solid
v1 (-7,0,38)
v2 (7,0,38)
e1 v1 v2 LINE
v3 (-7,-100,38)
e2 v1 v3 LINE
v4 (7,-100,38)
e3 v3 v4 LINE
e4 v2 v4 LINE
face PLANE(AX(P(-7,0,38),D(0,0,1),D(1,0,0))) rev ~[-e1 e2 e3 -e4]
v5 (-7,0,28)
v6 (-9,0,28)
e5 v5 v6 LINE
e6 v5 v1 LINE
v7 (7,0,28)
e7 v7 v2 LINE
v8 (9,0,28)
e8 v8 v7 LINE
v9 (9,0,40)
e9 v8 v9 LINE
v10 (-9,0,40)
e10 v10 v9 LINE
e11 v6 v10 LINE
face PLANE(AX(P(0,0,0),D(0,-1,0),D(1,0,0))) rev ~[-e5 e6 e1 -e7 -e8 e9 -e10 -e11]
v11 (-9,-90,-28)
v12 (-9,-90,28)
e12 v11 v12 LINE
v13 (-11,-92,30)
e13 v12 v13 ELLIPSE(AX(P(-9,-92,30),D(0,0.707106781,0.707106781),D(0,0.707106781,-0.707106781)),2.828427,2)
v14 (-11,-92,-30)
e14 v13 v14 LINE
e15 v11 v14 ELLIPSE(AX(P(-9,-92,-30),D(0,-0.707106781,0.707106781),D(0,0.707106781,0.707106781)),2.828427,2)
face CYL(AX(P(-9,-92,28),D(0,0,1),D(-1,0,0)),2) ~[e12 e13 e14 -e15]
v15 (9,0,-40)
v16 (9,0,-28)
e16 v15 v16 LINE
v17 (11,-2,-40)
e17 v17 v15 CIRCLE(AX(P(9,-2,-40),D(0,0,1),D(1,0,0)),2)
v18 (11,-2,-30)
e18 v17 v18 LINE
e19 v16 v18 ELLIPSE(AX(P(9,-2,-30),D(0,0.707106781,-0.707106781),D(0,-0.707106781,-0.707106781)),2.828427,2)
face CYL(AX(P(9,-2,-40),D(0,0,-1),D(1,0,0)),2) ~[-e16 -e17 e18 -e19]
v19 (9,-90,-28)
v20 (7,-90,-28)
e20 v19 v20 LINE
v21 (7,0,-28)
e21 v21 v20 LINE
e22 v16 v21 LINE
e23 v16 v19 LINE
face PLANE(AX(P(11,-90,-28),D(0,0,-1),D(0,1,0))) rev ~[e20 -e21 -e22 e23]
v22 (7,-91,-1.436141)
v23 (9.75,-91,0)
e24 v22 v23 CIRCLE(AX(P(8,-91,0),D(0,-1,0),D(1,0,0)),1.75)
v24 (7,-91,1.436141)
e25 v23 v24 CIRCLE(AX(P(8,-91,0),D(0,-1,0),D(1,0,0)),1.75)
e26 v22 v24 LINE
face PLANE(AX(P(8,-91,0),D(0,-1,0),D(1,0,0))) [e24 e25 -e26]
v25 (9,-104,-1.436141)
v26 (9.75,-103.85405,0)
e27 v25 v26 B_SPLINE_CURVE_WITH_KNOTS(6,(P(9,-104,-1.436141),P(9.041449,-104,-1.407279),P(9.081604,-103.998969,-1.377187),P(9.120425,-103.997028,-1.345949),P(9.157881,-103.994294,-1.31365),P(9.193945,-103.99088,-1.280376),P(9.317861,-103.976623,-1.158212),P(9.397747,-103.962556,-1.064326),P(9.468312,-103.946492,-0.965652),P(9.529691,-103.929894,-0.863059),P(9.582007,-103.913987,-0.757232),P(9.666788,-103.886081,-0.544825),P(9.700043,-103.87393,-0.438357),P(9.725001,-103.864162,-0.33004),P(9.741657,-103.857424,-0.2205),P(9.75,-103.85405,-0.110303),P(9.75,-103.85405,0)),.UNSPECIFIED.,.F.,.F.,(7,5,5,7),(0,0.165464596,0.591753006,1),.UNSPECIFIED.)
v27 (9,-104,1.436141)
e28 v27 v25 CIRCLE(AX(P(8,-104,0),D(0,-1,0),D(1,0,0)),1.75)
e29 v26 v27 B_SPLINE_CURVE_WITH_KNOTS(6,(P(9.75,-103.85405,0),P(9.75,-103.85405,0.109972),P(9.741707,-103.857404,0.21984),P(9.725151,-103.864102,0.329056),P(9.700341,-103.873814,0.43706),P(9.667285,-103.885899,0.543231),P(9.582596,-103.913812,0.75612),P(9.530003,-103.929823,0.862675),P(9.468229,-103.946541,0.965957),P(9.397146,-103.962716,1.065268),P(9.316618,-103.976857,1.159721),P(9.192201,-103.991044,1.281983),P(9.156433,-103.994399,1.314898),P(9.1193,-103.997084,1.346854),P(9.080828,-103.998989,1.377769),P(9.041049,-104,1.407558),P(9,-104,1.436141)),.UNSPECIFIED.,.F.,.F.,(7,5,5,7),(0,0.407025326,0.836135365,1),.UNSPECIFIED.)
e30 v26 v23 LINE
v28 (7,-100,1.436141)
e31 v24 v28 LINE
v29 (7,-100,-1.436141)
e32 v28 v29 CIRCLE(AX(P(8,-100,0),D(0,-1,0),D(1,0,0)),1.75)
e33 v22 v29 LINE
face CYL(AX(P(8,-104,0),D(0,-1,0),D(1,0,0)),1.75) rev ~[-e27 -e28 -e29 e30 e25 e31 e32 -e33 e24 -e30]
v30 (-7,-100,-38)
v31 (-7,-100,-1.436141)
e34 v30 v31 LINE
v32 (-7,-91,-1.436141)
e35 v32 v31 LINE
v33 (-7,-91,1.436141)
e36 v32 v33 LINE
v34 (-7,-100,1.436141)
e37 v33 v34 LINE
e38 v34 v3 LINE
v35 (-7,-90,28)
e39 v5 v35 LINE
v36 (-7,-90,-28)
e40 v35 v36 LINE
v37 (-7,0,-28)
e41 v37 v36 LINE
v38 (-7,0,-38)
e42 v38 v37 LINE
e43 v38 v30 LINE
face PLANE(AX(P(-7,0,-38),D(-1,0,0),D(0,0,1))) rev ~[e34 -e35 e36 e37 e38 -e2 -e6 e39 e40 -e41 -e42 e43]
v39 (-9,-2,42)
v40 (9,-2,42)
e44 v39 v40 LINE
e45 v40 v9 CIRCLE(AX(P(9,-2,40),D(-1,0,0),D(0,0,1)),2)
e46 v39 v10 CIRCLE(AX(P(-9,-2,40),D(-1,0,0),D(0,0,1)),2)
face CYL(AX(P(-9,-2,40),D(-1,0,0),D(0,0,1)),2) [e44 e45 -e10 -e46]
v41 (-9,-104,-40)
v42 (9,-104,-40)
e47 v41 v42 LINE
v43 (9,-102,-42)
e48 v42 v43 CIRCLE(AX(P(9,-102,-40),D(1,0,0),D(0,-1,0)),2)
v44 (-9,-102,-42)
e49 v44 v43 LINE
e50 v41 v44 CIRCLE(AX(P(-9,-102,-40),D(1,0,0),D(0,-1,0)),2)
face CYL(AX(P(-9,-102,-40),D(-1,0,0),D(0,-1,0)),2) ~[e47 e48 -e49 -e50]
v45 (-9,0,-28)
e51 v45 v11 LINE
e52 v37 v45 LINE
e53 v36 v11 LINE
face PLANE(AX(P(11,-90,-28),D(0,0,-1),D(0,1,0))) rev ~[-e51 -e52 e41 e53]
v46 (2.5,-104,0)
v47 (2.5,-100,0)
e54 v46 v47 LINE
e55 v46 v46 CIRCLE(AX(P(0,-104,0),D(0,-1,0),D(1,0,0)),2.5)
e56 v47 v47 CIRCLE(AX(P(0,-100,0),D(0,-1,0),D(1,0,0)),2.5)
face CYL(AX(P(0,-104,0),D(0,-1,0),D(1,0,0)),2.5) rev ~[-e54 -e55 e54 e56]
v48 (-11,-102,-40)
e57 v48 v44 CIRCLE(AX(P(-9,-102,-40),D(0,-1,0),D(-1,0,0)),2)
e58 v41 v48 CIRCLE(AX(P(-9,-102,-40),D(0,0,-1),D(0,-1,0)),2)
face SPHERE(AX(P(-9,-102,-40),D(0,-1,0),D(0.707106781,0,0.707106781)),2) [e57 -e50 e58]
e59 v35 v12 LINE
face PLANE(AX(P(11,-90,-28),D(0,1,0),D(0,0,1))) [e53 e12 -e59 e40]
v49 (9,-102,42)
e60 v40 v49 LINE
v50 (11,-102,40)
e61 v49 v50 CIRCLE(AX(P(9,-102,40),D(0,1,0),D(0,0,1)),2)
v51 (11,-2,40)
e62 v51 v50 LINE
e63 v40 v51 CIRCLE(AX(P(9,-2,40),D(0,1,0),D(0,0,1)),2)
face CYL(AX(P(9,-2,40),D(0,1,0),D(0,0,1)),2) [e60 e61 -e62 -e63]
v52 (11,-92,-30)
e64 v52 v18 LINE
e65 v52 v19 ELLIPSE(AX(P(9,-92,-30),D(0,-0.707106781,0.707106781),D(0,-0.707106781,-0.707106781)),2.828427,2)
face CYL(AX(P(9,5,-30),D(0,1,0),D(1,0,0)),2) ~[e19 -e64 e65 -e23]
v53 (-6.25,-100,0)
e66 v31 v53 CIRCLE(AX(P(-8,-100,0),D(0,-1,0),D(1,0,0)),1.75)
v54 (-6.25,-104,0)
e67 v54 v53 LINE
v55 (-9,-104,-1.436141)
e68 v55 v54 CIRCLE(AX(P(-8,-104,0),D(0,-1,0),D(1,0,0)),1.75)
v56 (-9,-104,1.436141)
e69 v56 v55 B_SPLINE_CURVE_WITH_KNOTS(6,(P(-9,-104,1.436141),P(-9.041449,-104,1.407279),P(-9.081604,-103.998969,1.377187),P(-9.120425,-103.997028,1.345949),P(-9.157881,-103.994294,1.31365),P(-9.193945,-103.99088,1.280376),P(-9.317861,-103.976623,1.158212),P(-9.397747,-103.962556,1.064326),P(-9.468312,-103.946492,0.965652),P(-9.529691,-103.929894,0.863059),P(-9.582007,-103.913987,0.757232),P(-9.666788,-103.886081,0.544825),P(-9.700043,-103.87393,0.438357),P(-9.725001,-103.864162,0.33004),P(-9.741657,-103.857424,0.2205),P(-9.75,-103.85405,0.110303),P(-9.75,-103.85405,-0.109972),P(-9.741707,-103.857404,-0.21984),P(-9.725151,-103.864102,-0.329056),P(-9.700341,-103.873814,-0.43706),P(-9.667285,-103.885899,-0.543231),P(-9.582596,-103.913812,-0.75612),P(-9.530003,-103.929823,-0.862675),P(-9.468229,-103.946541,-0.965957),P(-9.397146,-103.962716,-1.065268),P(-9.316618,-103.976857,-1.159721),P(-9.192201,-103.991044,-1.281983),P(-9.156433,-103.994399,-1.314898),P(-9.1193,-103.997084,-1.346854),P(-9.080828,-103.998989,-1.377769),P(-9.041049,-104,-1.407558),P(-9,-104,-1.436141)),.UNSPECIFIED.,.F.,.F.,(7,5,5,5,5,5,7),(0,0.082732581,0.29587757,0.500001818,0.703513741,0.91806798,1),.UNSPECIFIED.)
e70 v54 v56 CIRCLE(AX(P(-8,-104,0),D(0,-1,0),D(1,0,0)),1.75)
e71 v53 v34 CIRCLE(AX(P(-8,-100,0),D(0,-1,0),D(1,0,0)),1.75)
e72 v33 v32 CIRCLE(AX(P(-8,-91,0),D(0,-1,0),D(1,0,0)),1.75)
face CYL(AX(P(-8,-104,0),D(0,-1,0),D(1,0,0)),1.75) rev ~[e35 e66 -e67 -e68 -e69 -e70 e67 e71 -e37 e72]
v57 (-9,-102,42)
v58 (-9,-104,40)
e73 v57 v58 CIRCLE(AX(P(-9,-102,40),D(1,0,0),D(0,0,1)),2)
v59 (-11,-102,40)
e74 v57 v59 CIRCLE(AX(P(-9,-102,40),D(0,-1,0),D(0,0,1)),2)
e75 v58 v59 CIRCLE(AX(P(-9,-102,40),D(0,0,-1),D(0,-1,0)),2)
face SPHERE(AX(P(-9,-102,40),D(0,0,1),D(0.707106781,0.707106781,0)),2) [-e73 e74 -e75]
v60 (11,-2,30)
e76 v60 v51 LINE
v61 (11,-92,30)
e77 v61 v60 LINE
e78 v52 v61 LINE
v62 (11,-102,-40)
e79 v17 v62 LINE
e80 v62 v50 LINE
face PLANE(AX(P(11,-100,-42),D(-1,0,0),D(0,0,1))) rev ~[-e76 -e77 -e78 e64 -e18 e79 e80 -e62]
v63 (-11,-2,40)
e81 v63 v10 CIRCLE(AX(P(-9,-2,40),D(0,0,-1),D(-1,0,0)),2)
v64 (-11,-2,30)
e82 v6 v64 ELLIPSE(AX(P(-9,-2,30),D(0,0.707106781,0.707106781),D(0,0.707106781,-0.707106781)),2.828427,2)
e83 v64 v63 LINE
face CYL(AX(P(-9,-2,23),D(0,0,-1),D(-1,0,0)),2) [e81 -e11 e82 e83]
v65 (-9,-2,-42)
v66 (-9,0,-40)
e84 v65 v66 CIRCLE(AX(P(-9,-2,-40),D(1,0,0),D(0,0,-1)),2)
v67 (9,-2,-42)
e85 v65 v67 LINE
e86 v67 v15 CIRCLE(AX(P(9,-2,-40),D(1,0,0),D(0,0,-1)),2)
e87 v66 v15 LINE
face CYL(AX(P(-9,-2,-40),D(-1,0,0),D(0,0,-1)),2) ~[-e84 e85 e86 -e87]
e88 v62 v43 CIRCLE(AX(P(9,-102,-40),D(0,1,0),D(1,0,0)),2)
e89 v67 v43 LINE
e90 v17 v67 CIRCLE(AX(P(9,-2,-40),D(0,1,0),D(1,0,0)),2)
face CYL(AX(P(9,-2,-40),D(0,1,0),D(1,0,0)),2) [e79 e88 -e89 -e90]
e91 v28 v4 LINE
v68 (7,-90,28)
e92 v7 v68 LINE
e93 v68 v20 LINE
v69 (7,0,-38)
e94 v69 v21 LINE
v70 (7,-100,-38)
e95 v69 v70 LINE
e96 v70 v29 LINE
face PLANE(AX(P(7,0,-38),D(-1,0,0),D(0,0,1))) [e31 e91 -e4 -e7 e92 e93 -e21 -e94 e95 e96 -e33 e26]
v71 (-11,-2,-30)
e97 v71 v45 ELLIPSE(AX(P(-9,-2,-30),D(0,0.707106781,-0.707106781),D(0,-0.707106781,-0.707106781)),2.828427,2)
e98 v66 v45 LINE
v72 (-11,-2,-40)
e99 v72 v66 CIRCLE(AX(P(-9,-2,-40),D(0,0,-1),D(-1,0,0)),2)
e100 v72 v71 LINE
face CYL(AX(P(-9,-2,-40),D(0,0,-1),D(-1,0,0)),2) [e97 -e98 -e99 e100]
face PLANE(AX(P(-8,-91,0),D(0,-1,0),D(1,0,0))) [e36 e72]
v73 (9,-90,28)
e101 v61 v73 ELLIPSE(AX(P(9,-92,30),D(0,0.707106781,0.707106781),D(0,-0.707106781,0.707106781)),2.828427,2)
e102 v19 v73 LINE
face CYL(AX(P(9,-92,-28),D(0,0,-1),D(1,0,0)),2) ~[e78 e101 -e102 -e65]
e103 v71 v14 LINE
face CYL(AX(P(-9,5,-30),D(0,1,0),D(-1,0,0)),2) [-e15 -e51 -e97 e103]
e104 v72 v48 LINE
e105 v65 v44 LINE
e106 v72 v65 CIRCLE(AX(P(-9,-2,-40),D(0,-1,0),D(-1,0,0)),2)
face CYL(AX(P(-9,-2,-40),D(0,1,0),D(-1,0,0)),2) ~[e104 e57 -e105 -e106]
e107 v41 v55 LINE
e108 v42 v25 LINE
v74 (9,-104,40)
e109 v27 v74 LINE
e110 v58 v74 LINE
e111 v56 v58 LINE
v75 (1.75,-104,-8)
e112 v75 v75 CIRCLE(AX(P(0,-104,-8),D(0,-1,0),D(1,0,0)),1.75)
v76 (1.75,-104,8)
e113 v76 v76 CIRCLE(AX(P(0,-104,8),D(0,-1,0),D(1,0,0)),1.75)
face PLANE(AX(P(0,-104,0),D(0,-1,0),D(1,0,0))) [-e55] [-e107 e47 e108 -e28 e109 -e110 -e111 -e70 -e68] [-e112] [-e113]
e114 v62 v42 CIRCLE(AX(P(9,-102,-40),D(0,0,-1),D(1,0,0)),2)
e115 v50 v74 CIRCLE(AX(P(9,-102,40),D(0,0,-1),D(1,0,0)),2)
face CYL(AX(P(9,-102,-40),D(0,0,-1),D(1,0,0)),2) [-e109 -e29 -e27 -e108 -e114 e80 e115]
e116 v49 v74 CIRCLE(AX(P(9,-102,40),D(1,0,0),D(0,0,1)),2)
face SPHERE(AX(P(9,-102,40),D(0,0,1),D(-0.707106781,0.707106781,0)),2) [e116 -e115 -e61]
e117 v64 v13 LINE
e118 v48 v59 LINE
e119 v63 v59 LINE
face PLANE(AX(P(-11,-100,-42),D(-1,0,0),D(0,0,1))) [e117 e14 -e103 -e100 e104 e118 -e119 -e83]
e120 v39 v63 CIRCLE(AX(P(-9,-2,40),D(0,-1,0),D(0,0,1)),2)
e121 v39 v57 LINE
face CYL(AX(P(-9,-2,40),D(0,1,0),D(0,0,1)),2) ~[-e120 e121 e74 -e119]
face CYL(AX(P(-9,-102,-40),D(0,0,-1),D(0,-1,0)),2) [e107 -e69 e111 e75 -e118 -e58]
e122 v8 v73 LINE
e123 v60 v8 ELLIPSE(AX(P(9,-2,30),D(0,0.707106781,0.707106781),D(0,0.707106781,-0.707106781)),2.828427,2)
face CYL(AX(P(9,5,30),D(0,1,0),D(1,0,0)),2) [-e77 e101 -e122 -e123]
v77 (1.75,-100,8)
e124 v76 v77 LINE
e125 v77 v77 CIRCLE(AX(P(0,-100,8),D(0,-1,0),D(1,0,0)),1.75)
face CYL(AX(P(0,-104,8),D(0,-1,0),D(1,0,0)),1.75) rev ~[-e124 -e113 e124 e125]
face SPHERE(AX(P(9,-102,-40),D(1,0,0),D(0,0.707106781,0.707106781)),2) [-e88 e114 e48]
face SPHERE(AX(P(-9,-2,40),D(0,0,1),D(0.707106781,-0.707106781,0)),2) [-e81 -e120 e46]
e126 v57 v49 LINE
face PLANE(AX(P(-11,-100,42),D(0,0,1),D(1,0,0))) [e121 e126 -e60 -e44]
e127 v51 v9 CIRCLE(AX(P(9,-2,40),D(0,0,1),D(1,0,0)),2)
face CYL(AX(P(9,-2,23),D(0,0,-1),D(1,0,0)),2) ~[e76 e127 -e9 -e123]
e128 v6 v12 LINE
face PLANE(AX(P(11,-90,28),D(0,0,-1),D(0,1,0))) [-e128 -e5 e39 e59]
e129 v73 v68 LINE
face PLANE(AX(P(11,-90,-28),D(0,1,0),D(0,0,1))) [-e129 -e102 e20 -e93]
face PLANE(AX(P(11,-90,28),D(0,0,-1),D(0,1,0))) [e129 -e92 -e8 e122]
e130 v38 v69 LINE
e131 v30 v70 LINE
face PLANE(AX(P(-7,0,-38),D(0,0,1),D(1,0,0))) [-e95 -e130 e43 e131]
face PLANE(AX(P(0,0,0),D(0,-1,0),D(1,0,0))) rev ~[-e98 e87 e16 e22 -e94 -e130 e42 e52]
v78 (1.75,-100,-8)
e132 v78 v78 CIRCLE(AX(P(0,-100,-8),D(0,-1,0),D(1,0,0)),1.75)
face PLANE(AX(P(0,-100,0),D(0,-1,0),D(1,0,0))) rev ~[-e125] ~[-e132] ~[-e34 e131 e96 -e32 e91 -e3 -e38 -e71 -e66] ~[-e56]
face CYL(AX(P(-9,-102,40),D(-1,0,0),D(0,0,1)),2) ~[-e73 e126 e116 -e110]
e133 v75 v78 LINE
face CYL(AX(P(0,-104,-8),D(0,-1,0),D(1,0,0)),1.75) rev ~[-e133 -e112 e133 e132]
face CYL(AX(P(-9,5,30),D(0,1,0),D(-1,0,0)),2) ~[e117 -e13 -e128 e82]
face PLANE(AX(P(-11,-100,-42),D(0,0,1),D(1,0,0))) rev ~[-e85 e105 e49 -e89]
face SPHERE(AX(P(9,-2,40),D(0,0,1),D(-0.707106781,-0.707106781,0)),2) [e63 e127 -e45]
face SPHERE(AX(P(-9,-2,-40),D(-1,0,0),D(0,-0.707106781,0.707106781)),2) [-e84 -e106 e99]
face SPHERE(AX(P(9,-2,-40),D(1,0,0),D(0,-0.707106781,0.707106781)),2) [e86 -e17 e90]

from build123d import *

# Parameters (mm, degrees)
F0_W          = 22
F0_H          = 84
F0_W_2        = 14
F0_H_2        = 76
F1_DEPTH      = 100
F2_W          = 22
F2_H          = 84
F3_DEPTH      = 4
F4_R          = 2.5
F4_R_2        = 1.75
F5_DEPTH      = 13
F6_W          = 90
F6_H          = 56
F7_DEPTH      = 22.001
F8_T1_DEPTH   = 100
F8_T3_DEPTH   = 17
F8_T5_DEPTH   = 95
F8_T7_DEPTH   = 56
F8_T9_DEPTH   = 17
F8_T11_DEPTH  = 80
F8_T13_DEPTH  = 18
F8_S17_W      = 2
F8_S17_H      = 2
F8_T18_DEPTH  = 2
F8_S23_W      = 2
F8_S23_H      = 2
F8_T24_DEPTH  = 2
F8_S29_W      = 2
F8_S29_H      = 2
F8_T30_DEPTH  = 2
F8_S35_W      = 2
F8_S35_H      = 2
F8_T36_DEPTH  = 2
F8_S41_W      = 2
F8_S41_H      = 2
F8_T42_DEPTH  = 2
F8_S47_W      = 2
F8_S47_H      = 2
F8_T48_DEPTH  = 2
F8_S53_W      = 2
F8_S53_H      = 2
F8_T54_DEPTH  = 2
F8_S59_W      = 2
F8_S59_H      = 2
F8_T60_DEPTH  = 2
F8_T67_DEPTH  = 100
F8_T71_DEPTH  = 61
F8_T78_DEPTH  = 61
F8_T82_DEPTH  = 100
F8_T89_DEPTH  = 100
F8_T93_DEPTH  = 61
F8_T100_DEPTH = 61
F8_T104_DEPTH = 100


# Not quite as in the source:
# - a fillet or chamfer that OpenCascade refuses, or shapes differently, is made with other operations: its cross-section is extruded or revolved along the edge and cut away or added


with BuildPart() as f1:
    # F0 (on Front) → F1 (new body)
    with BuildSketch(Plane.XZ):
        Rectangle(F0_W, F0_H)
        Rectangle(F0_W_2, F0_H_2, mode=Mode.SUBTRACT)
    extrude(amount=F1_DEPTH)

    # F2 (on face) → F3 (join)
    with BuildSketch(Plane.XZ.offset(100)):
        Rectangle(F2_W, F2_H)
    extrude(amount=F3_DEPTH)

    # F4 (on face) → F5 (cut)
    with BuildSketch(Plane.XZ.offset(104)):
        Circle(F4_R)
        with Locations((0, 8)):
            Circle(F4_R_2)
        with Locations((-8, 0)):
            Circle(F4_R_2)
        with Locations((0, -8)):
            Circle(F4_R_2)
        with Locations((8, 0)):
            Circle(F4_R_2)
    extrude(amount=-F5_DEPTH, mode=Mode.SUBTRACT)

    # F6 (on face) → F7 (cut, through all)
    with BuildSketch(Plane.YZ.offset(11)):
        with Locations((-45, 0)):
            Rectangle(F6_W, F6_H)
    extrude(amount=-F7_DEPTH, mode=Mode.SUBTRACT)

    # F8: fillet of radius 2 on 20 edges, made by hand

    # F8_s2 → F8_t1 (cut)
    with BuildSketch(Plane.XZ.offset(2)):
        with BuildLine():
            ThreePointArc((11, -40), (10.4142135624, -41.4142135624), (9, -42))
            Line((9, -42), (11, -42))
            Line((11, -42), (11, -40))
        make_face()
        with BuildLine():
            ThreePointArc((9, 42), (10.4142135624, 41.4142135624), (11, 40))
            Line((11, 40), (11, 42))
            Line((11, 42), (9, 42))
        make_face()
        with BuildLine():
            ThreePointArc((-11, -40), (-10.4142135624, -41.4142135624), (-9, -42))
            Line((-9, -42), (-11, -42))
            Line((-11, -42), (-11, -40))
        make_face()
        with BuildLine():
            ThreePointArc((-9, 42), (-10.4142135624, 41.4142135624), (-11, 40))
            Line((-11, 40), (-11, 42))
            Line((-11, 42), (-9, 42))
        make_face()
    extrude(amount=F8_T1_DEPTH, mode=Mode.SUBTRACT)

    # F8_s4 → F8_t3 (cut)
    with BuildSketch(Plane.XY.offset(-40)):
        with BuildLine():
            ThreePointArc((11, -2), (10.4142135624, -0.5857864376), (9, 0))
            Line((9, 0), (11, 0))
            Line((11, 0), (11, -2))
        make_face()
        with BuildLine():
            ThreePointArc((-11, -2), (-10.4142135624, -0.5857864376), (-9, 0))
            Line((-9, 0), (-11, 0))
            Line((-11, 0), (-11, -2))
        make_face()
    extrude(amount=F8_T3_DEPTH, mode=Mode.SUBTRACT)

    # F8_s6 → F8_t5 (cut)
    with BuildSketch(Plane.XZ.offset(-5)):
        with BuildLine():
            ThreePointArc((11, -30), (10.4142135624, -28.5857864376), (9, -28))
            Line((9, -28), (11, -28))
            Line((11, -28), (11, -30))
        make_face()
        with BuildLine():
            ThreePointArc((11, 30), (10.4142135624, 28.5857864376), (9, 28))
            Line((9, 28), (11, 28))
            Line((11, 28), (11, 30))
        make_face()
        with BuildLine():
            ThreePointArc((-11, 30), (-10.4142135624, 28.5857864376), (-9, 28))
            Line((-9, 28), (-11, 28))
            Line((-11, 28), (-11, 30))
        make_face()
        with BuildLine():
            ThreePointArc((-11, -30), (-10.4142135624, -28.5857864376), (-9, -28))
            Line((-9, -28), (-11, -28))
            Line((-11, -28), (-11, -30))
        make_face()
    extrude(amount=F8_T5_DEPTH, mode=Mode.SUBTRACT)

    # F8_s8 → F8_t7 (cut)
    with BuildSketch(Plane.XY.offset(-28)):
        with BuildLine():
            ThreePointArc((11, -92), (10.4142135624, -90.5857864376), (9, -90))
            Line((9, -90), (11, -90))
            Line((11, -90), (11, -92))
        make_face()
        with BuildLine():
            ThreePointArc((-11, -92), (-10.4142135624, -90.5857864376), (-9, -90))
            Line((-9, -90), (-11, -90))
            Line((-11, -90), (-11, -92))
        make_face()
    extrude(amount=F8_T7_DEPTH, mode=Mode.SUBTRACT)

    # F8_s10 → F8_t9 (cut)
    with BuildSketch(Plane.XY.offset(23)):
        with BuildLine():
            ThreePointArc((11, -2), (10.4142135624, -0.5857864376), (9, 0))
            Line((9, 0), (11, 0))
            Line((11, 0), (11, -2))
        make_face()
        with BuildLine():
            ThreePointArc((-11, -2), (-10.4142135624, -0.5857864376), (-9, 0))
            Line((-9, 0), (-11, 0))
            Line((-11, 0), (-11, -2))
        make_face()
    extrude(amount=F8_T9_DEPTH, mode=Mode.SUBTRACT)

    # F8_s12 → F8_t11 (cut)
    with BuildSketch(Plane.XY.offset(-40)):
        with BuildLine():
            ThreePointArc((11, -102), (10.4142135624, -103.4142135624), (9, -104))
            Line((9, -104), (11, -104))
            Line((11, -104), (11, -102))
        make_face()
        with BuildLine():
            ThreePointArc((-9, -104), (-10.4142135624, -103.4142135624), (-11, -102))
            Line((-11, -102), (-11, -104))
            Line((-11, -104), (-9, -104))
        make_face()
    extrude(amount=F8_T11_DEPTH, mode=Mode.SUBTRACT)

    # F8_s14 → F8_t13 (cut)
    with BuildSketch(Plane.YZ.offset(-9)):
        with BuildLine():
            ThreePointArc((-102, 42), (-103.4142135624, 41.4142135624), (-104, 40))
            Line((-104, 40), (-104, 42))
            Line((-104, 42), (-102, 42))
        make_face()
        with BuildLine():
            ThreePointArc((-2, 42), (-0.5857864376, 41.4142135624), (0, 40))
            Line((0, 40), (0, 42))
            Line((0, 42), (-2, 42))
        make_face()
        with BuildLine():
            ThreePointArc((-104, -40), (-103.4142135624, -41.4142135624), (-102, -42))
            Line((-102, -42), (-104, -42))
            Line((-104, -42), (-104, -40))
        make_face()
        with BuildLine():
            ThreePointArc((-2, -42), (-0.5857864376, -41.4142135624), (0, -40))
            Line((0, -40), (0, -42))
            Line((0, -42), (-2, -42))
        make_face()
    extrude(amount=F8_T13_DEPTH, mode=Mode.SUBTRACT)


with BuildPart() as f8_tool16:
    # F8_s17 → F8_t18 (new body)
    with BuildSketch(Plane.YZ.offset(9)):
        with Locations((-103, -41)):
            Rectangle(F8_S17_W, F8_S17_H)
    extrude(amount=F8_T18_DEPTH)

    # F8_s19 → F8_t20 (revolve, cut)
    with BuildSketch(Plane(origin=(9, -102, -40), x_dir=(0, 0.7071067812, 0.7071067812), z_dir=(0, 0.7071067812, -0.7071067812))):
        with BuildLine():
            ThreePointArc((0, -2), (2, 0), (0, 2))
            Line((0, 2), (0, -2))
        make_face()
    revolve(axis=Axis((9, -102, -40), (1, 0, 0)), mode=Mode.SUBTRACT)


with BuildPart() as f1_1:
    add(f1.part)

    # F8_t15: cut F8_tool16
    add(f8_tool16.part, mode=Mode.SUBTRACT)


with BuildPart() as f8_tool22:
    # F8_s23 → F8_t24 (new body)
    with BuildSketch(Plane.YZ.offset(9)):
        with Locations((-1, -41)):
            Rectangle(F8_S23_W, F8_S23_H)
    extrude(amount=F8_T24_DEPTH)

    # F8_s25 → F8_t26 (revolve, cut)
    with BuildSketch(Plane(origin=(9, -2, -40), x_dir=(0, -0.7071067812, 0.7071067812), z_dir=(0, 0.7071067812, 0.7071067812))):
        with BuildLine():
            ThreePointArc((0, -2), (2, 0), (0, 2))
            Line((0, 2), (0, -2))
        make_face()
    revolve(axis=Axis((9, -2, -40), (1, 0, 0)), mode=Mode.SUBTRACT)


with BuildPart() as f1_2:
    add(f1_1.part)

    # F8_t21: cut F8_tool22
    add(f8_tool22.part, mode=Mode.SUBTRACT)


with BuildPart() as f8_tool28:
    # F8_s29 → F8_t30 (new body)
    with BuildSketch(Plane.XY.offset(40)):
        with Locations((10, -1)):
            Rectangle(F8_S29_W, F8_S29_H)
    extrude(amount=F8_T30_DEPTH)

    # F8_s31 → F8_t32 (revolve, cut)
    with BuildSketch(Plane(origin=(9, -2, 40), x_dir=(-0.7071067812, -0.7071067812, 0), z_dir=(-0.7071067812, 0.7071067812, 0))):
        with BuildLine():
            ThreePointArc((0, -2), (2, 0), (0, 2))
            Line((0, 2), (0, -2))
        make_face()
    revolve(axis=Axis((9, -2, 40), (0, 0, 1)), mode=Mode.SUBTRACT)


with BuildPart() as f1_3:
    add(f1_2.part)

    # F8_t27: cut F8_tool28
    add(f8_tool28.part, mode=Mode.SUBTRACT)


with BuildPart() as f8_tool34:
    # F8_s35 → F8_t36 (new body)
    with BuildSketch(Plane.XY.offset(40)):
        with Locations((10, -103)):
            Rectangle(F8_S35_W, F8_S35_H)
    extrude(amount=F8_T36_DEPTH)

    # F8_s37 → F8_t38 (revolve, cut)
    with BuildSketch(Plane(origin=(9, -102, 40), x_dir=(-0.7071067812, 0.7071067812, 0), z_dir=(0.7071067812, 0.7071067812, 0))):
        with BuildLine():
            ThreePointArc((0, -2), (2, 0), (0, 2))
            Line((0, 2), (0, -2))
        make_face()
    revolve(axis=Axis((9, -102, 40), (0, 0, 1)), mode=Mode.SUBTRACT)


with BuildPart() as f1_4:
    add(f1_3.part)

    # F8_t33: cut F8_tool34
    add(f8_tool34.part, mode=Mode.SUBTRACT)


with BuildPart() as f8_tool40:
    # F8_s41 → F8_t42 (new body)
    with BuildSketch(Plane.XY.offset(40)):
        with Locations((-10, -1)):
            Rectangle(F8_S41_W, F8_S41_H)
    extrude(amount=F8_T42_DEPTH)

    # F8_s43 → F8_t44 (revolve, cut)
    with BuildSketch(Plane(origin=(-9, -2, 40), x_dir=(0.7071067812, -0.7071067812, 0), z_dir=(-0.7071067812, -0.7071067812, 0))):
        with BuildLine():
            ThreePointArc((0, -2), (2, 0), (0, 2))
            Line((0, 2), (0, -2))
        make_face()
    revolve(axis=Axis((-9, -2, 40), (0, 0, 1)), mode=Mode.SUBTRACT)


with BuildPart() as f1_5:
    add(f1_4.part)

    # F8_t39: cut F8_tool40
    add(f8_tool40.part, mode=Mode.SUBTRACT)


with BuildPart() as f8_tool46:
    # F8_s47 → F8_t48 (new body)
    with BuildSketch(Plane.YZ.offset(-9)):
        with Locations((-1, -41)):
            Rectangle(F8_S47_W, F8_S47_H)
    extrude(amount=-F8_T48_DEPTH)

    # F8_s49 → F8_t50 (revolve, cut)
    with BuildSketch(Plane(origin=(-9, -2, -40), x_dir=(0, -0.7071067812, 0.7071067812), z_dir=(0, -0.7071067812, -0.7071067812))):
        with BuildLine():
            ThreePointArc((0, -2), (2, 0), (0, 2))
            Line((0, 2), (0, -2))
        make_face()
    revolve(axis=Axis((-9, -2, -40), (-1, 0, 0)), mode=Mode.SUBTRACT)


with BuildPart() as f1_6:
    add(f1_5.part)

    # F8_t45: cut F8_tool46
    add(f8_tool46.part, mode=Mode.SUBTRACT)


with BuildPart() as f8_tool52:
    # F8_s53 → F8_t54 (new body)
    with BuildSketch(Plane.XZ.offset(102)):
        with Locations((-10, -41)):
            Rectangle(F8_S53_W, F8_S53_H)
    extrude(amount=F8_T54_DEPTH)

    # F8_s55 → F8_t56 (revolve, cut)
    with BuildSketch(Plane(origin=(-9, -102, -40), x_dir=(0.7071067812, 0, 0.7071067812), z_dir=(0.7071067812, 0, -0.7071067812))):
        with BuildLine():
            ThreePointArc((0, -2), (2, 0), (0, 2))
            Line((0, 2), (0, -2))
        make_face()
    revolve(axis=Axis((-9, -102, -40), (0, -1, 0)), mode=Mode.SUBTRACT)


with BuildPart() as f1_7:
    add(f1_6.part)

    # F8_t51: cut F8_tool52
    add(f8_tool52.part, mode=Mode.SUBTRACT)


with BuildPart() as f8_tool58:
    # F8_s59 → F8_t60 (new body)
    with BuildSketch(Plane.XY.offset(40)):
        with Locations((-10, -103)):
            Rectangle(F8_S59_W, F8_S59_H)
    extrude(amount=F8_T60_DEPTH)

    # F8_s61 → F8_t62 (revolve, cut)
    with BuildSketch(Plane(origin=(-9, -102, 40), x_dir=(0.7071067812, 0.7071067812, 0), z_dir=(0.7071067812, -0.7071067812, 0))):
        with BuildLine():
            ThreePointArc((0, -2), (2, 0), (0, 2))
            Line((0, 2), (0, -2))
        make_face()
    revolve(axis=Axis((-9, -102, 40), (0, 0, 1)), mode=Mode.SUBTRACT)


with BuildPart() as f1_8:
    add(f1_7.part)

    # F8_t57: cut F8_tool58
    add(f8_tool58.part, mode=Mode.SUBTRACT)


with BuildPart() as f8_tool65:
    # F8_s66 → F8_t67 (new body)
    with BuildSketch(Plane.XZ.offset(95)):
        with BuildLine():
            ThreePointArc((11, -30), (10.4142135624, -28.5857864376), (9, -28))
            Line((9, -28), (11, -28))
            Line((11, -28), (11, -30))
        make_face()
    extrude(amount=-F8_T67_DEPTH)

    split(bisect_by=Plane.XZ.offset(90), keep=Keep.TOP)


with BuildPart() as f8_tool69:
    # F8_s70 → F8_t71 (new body)
    with BuildSketch(Plane.XY.offset(28)):
        with BuildLine():
            ThreePointArc((11, -92), (10.4142135624, -90.5857864376), (9, -90))
            Line((9, -90), (11, -90))
            Line((11, -90), (11, -92))
        make_face()
    extrude(amount=-F8_T71_DEPTH)

    split(bisect_by=Plane.XY.offset(-28), keep=Keep.BOTTOM)


with BuildPart() as f8_tool65_1:
    add(f8_tool65.part)

    # F8_t73: intersect F8_tool69
    add(f8_tool69.part, mode=Mode.INTERSECT)


with BuildPart() as f1_9:
    add(f1_8.part)

    # F8_t63: cut F8_tool65
    add(f8_tool65_1.part, mode=Mode.SUBTRACT)


with BuildPart() as f8_tool76:
    # F8_s77 → F8_t78 (new body)
    with BuildSketch(Plane.XY.offset(33)):
        with BuildLine():
            ThreePointArc((11, -92), (10.4142135624, -90.5857864376), (9, -90))
            Line((9, -90), (11, -90))
            Line((11, -90), (11, -92))
        make_face()
    extrude(amount=-F8_T78_DEPTH)

    split(bisect_by=Plane.XY.offset(28), keep=Keep.TOP)


with BuildPart() as f8_tool80:
    # F8_s81 → F8_t82 (new body)
    with BuildSketch(Plane.XZ.offset(-5)):
        with BuildLine():
            ThreePointArc((11, 30), (10.4142135624, 28.5857864376), (9, 28))
            Line((9, 28), (11, 28))
            Line((11, 28), (11, 30))
        make_face()
    extrude(amount=F8_T82_DEPTH)

    split(bisect_by=Plane.XZ.offset(90), keep=Keep.TOP)


with BuildPart() as f8_tool76_1:
    add(f8_tool76.part)

    # F8_t84: intersect F8_tool80
    add(f8_tool80.part, mode=Mode.INTERSECT)


with BuildPart() as f1_10:
    add(f1_9.part)

    # F8_t74: cut F8_tool76
    add(f8_tool76_1.part, mode=Mode.SUBTRACT)


with BuildPart() as f8_tool87:
    # F8_s88 → F8_t89 (new body)
    with BuildSketch(Plane.XZ.offset(-5)):
        with BuildLine():
            ThreePointArc((-11, 30), (-10.4142135624, 28.5857864376), (-9, 28))
            Line((-9, 28), (-11, 28))
            Line((-11, 28), (-11, 30))
        make_face()
    extrude(amount=F8_T89_DEPTH)

    split(bisect_by=Plane.XZ.offset(90), keep=Keep.TOP)


with BuildPart() as f8_tool91:
    # F8_s92 → F8_t93 (new body)
    with BuildSketch(Plane.XY.offset(33)):
        with BuildLine():
            ThreePointArc((-11, -92), (-10.4142135624, -90.5857864376), (-9, -90))
            Line((-9, -90), (-11, -90))
            Line((-11, -90), (-11, -92))
        make_face()
    extrude(amount=-F8_T93_DEPTH)

    split(bisect_by=Plane.XY.offset(28), keep=Keep.TOP)


with BuildPart() as f8_tool87_1:
    add(f8_tool87.part)

    # F8_t95: intersect F8_tool91
    add(f8_tool91.part, mode=Mode.INTERSECT)


with BuildPart() as f1_11:
    add(f1_10.part)

    # F8_t85: cut F8_tool87
    add(f8_tool87_1.part, mode=Mode.SUBTRACT)


with BuildPart() as f8_tool98:
    # F8_s99 → F8_t100 (new body)
    with BuildSketch(Plane.XY.offset(28)):
        with BuildLine():
            ThreePointArc((-11, -92), (-10.4142135624, -90.5857864376), (-9, -90))
            Line((-9, -90), (-11, -90))
            Line((-11, -90), (-11, -92))
        make_face()
    extrude(amount=-F8_T100_DEPTH)

    split(bisect_by=Plane.XY.offset(-28), keep=Keep.BOTTOM)


with BuildPart() as f8_tool102:
    # F8_s103 → F8_t104 (new body)
    with BuildSketch(Plane.XZ.offset(95)):
        with BuildLine():
            ThreePointArc((-11, -30), (-10.4142135624, -28.5857864376), (-9, -28))
            Line((-9, -28), (-11, -28))
            Line((-11, -28), (-11, -30))
        make_face()
    extrude(amount=-F8_T104_DEPTH)

    split(bisect_by=Plane.XZ.offset(90), keep=Keep.TOP)


with BuildPart() as f8_tool98_1:
    add(f8_tool98.part)

    # F8_t106: intersect F8_tool102
    add(f8_tool102.part, mode=Mode.INTERSECT)


with BuildPart() as f1_12:
    add(f1_11.part)

    # F8_t96: cut F8_tool98
    add(f8_tool98_1.part, mode=Mode.SUBTRACT)


solid = f1_12.part
